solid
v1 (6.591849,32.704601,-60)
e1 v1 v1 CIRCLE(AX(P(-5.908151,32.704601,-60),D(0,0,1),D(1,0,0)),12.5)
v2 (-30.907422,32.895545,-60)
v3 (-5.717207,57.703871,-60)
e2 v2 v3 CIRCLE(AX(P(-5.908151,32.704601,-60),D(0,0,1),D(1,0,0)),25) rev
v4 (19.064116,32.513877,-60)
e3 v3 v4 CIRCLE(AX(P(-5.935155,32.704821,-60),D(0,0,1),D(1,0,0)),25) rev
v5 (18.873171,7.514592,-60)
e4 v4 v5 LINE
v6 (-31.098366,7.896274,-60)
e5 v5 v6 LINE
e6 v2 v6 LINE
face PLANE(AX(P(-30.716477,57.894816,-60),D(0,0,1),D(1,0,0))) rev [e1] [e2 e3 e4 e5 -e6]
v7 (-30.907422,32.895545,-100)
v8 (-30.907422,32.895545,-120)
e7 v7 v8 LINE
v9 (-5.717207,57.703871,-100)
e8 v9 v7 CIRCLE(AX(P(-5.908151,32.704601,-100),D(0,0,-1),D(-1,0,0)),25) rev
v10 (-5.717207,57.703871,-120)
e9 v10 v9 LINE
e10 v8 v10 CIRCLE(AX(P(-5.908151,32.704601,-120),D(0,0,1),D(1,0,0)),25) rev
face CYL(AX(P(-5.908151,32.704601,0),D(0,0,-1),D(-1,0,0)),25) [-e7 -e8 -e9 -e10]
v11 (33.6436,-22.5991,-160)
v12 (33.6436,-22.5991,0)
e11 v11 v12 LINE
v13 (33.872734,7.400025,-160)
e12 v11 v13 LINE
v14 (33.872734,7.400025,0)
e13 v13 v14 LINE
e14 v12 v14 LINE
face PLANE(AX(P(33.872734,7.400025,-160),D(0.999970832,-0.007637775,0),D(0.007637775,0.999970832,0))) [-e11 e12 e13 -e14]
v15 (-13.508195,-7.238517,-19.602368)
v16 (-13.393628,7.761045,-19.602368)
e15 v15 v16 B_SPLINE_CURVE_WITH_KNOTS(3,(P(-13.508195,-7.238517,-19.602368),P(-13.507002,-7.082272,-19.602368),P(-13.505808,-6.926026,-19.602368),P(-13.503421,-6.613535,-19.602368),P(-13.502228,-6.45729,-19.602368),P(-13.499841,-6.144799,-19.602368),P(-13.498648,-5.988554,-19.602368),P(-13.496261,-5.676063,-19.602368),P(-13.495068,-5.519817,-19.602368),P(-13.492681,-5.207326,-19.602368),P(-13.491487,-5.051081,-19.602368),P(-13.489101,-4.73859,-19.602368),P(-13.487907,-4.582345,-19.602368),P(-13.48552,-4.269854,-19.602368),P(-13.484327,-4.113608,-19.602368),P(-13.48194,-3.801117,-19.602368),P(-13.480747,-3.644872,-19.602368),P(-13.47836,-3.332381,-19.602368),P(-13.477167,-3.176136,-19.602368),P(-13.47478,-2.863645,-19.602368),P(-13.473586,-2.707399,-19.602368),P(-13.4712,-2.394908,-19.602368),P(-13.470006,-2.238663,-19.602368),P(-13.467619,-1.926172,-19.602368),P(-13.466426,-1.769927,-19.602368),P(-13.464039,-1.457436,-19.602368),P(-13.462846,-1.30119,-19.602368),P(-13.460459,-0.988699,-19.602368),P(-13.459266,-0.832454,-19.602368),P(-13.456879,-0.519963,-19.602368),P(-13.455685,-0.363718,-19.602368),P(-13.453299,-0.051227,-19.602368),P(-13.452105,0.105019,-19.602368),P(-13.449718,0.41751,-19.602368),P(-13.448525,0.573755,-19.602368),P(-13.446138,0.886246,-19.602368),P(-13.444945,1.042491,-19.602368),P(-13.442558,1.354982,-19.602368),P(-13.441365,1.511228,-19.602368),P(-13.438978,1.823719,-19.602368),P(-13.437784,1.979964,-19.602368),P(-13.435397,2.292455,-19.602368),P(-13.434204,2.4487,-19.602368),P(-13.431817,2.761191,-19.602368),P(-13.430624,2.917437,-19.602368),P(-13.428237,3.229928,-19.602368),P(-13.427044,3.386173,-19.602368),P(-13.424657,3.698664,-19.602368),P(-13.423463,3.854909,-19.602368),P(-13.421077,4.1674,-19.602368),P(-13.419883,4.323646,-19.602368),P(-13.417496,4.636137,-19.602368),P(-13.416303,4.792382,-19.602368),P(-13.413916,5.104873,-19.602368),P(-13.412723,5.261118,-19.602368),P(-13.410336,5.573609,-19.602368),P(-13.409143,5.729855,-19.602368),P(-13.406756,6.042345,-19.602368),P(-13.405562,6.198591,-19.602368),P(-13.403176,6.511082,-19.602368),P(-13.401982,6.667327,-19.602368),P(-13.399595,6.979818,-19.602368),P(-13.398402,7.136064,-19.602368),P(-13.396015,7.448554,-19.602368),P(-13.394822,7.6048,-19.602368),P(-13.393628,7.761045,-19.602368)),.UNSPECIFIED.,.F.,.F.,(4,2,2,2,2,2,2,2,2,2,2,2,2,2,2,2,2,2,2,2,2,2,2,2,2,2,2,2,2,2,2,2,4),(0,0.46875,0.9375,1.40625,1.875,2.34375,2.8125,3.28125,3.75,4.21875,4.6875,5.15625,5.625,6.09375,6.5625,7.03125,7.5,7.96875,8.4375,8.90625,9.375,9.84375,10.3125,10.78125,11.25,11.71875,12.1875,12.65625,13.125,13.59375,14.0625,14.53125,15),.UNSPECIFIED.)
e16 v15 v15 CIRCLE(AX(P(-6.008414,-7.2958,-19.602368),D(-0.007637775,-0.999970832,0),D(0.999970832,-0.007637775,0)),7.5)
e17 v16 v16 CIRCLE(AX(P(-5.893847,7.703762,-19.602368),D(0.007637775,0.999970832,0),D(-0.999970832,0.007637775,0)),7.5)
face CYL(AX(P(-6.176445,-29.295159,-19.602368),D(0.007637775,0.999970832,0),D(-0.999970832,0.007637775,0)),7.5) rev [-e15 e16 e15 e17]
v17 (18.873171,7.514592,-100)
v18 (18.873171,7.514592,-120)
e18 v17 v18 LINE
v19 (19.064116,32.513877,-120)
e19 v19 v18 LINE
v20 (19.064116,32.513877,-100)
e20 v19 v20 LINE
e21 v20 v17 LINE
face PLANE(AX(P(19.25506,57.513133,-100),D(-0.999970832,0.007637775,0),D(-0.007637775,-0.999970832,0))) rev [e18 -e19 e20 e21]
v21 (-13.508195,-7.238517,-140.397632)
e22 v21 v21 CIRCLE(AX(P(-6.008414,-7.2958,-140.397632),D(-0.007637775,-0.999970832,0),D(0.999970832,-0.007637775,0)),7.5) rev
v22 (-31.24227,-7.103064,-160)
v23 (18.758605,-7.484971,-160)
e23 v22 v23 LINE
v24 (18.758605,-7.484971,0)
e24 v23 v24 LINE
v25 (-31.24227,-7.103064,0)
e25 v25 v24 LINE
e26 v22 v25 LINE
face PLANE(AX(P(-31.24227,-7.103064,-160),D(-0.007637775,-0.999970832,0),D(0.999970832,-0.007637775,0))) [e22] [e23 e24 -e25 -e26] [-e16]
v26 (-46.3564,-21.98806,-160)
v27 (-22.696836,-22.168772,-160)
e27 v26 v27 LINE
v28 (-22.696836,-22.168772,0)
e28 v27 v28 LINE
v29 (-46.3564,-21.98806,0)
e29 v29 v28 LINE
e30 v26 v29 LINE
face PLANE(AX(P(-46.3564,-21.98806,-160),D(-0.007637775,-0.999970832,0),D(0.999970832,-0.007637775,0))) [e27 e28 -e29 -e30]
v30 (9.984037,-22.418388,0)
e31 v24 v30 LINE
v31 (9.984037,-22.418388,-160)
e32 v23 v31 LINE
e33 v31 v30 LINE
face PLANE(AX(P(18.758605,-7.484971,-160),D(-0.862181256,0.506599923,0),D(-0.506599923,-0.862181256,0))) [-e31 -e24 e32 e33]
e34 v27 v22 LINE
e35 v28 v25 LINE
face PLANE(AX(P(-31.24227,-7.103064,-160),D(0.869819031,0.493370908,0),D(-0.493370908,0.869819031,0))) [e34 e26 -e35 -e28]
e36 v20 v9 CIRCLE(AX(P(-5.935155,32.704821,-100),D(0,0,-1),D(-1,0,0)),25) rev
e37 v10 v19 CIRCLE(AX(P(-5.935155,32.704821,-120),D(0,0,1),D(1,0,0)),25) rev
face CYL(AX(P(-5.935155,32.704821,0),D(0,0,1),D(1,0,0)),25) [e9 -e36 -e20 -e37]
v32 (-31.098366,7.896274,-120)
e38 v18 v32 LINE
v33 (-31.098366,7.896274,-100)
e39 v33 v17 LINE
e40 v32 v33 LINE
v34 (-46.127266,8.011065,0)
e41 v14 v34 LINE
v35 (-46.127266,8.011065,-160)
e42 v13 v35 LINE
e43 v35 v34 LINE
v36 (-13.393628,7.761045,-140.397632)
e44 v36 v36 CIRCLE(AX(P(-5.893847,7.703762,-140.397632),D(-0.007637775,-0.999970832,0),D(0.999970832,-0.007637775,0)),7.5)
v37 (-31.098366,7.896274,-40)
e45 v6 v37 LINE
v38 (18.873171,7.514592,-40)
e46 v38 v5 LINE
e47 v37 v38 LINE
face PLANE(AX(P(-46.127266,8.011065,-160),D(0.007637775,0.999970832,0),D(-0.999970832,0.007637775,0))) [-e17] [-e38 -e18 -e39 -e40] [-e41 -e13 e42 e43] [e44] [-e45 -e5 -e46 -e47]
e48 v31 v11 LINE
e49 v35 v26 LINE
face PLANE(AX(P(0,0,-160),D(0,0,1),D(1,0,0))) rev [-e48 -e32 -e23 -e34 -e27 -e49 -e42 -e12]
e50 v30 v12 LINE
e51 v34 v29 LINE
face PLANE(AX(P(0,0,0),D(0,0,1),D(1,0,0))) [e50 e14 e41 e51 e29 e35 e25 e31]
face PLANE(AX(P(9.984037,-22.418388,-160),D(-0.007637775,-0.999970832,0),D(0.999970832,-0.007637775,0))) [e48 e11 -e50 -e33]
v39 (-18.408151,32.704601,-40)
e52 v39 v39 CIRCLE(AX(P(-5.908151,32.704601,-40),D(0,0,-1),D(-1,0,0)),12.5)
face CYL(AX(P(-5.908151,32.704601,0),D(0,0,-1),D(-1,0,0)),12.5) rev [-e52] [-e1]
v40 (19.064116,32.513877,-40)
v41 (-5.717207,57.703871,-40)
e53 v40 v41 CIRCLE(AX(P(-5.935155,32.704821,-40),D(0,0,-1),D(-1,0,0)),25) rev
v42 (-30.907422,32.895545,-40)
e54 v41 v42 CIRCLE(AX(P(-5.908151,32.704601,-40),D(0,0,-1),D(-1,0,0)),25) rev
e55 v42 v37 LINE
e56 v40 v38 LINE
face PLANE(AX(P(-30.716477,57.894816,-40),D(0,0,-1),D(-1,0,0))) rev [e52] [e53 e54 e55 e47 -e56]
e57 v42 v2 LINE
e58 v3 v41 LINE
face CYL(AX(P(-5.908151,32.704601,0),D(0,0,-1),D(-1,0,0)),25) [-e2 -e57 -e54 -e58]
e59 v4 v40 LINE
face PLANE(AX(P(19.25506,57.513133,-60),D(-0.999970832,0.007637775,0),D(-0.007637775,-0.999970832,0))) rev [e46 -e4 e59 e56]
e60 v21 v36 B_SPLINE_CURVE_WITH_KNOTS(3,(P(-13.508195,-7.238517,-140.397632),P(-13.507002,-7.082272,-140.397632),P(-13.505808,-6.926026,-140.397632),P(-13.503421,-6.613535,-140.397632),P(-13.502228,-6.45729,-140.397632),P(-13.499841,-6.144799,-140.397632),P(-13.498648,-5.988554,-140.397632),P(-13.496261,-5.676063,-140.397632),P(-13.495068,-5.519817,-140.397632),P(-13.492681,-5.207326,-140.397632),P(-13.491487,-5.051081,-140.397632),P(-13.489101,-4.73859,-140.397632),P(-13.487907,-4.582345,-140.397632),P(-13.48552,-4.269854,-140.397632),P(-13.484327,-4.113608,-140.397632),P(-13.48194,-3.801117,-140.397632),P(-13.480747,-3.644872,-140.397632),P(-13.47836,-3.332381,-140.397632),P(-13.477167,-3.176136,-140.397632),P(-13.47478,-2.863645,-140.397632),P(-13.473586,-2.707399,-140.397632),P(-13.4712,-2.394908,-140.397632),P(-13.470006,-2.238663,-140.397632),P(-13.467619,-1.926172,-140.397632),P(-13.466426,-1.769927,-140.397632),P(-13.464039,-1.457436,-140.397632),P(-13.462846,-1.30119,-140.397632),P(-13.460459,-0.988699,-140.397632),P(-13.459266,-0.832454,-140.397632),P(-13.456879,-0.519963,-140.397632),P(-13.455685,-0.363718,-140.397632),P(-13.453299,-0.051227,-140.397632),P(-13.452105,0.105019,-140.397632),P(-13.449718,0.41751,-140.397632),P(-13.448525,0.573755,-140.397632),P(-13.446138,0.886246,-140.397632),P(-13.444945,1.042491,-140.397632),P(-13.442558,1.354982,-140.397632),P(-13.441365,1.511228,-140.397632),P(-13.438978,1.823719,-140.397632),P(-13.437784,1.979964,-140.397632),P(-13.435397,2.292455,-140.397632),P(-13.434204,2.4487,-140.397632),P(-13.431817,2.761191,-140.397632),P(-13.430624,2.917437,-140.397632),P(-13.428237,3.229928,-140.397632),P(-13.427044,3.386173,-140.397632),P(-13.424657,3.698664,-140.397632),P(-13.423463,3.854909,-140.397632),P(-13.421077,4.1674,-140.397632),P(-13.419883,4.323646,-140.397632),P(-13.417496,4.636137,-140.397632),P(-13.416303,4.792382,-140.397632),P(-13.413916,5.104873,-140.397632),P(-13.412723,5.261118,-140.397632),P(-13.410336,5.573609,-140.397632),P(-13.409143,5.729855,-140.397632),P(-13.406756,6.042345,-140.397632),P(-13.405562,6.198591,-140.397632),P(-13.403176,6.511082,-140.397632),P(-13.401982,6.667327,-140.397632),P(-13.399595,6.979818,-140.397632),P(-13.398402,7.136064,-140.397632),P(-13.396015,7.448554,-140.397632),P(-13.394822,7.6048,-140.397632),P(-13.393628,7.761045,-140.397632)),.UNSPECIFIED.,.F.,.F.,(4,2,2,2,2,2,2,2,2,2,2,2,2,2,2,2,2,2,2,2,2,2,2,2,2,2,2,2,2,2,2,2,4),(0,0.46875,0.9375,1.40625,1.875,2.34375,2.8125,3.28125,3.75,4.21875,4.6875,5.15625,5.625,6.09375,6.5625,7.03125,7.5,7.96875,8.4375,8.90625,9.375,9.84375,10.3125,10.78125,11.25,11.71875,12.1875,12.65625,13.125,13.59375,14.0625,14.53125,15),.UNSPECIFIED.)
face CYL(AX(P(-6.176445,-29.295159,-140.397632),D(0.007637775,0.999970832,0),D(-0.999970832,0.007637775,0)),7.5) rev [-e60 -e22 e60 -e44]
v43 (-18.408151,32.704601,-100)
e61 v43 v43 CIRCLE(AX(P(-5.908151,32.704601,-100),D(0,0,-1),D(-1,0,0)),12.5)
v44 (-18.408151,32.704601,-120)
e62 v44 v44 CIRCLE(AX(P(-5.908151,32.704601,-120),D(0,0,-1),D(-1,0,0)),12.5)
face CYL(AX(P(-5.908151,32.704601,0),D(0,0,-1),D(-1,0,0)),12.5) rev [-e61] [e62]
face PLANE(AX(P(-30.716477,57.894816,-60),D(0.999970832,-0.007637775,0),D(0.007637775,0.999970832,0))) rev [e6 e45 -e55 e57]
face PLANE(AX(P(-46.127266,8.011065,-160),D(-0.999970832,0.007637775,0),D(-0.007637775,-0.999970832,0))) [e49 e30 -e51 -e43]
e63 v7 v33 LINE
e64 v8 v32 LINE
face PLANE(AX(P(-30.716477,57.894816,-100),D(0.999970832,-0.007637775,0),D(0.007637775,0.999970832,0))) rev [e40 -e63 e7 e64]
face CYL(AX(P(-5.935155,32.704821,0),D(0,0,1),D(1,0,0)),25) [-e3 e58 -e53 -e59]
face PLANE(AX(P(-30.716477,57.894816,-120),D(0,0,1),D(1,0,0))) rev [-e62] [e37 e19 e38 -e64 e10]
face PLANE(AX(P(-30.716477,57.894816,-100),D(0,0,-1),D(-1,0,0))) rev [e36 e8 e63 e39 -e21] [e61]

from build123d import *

# Parameters (mm, degrees)
BOSS_EXTRUDE2_DEPTH = 160
SKETCH10_R          = 7.5
CUT_EXTRUDE3_DEPTH  = 37
SKETCH15_W          = 49.972994953
SKETCH15_H          = 20
BOSS_EXTRUDE3_DEPTH = 50
FILLET8_R           = 25
FILLET9_R           = 25
FILLET10_R          = 25
FILLET11_R          = 25
SKETCH20_R          = 12.5
CUT_EXTRUDE16_DEPTH = 120


with BuildPart() as part:
    # Sketch9 → Boss-Extrude2 (new body)
    with BuildSketch(Plane.XY):
        Polygon((-46.127266272, 8.011064826), (33.872733728, 7.400024977), (33.643600468, -22.599099976), (9.984036558, -22.418388271), (18.758604622, -7.484970869), (-31.242270425, -7.10306428), (-22.696835622, -22.168771831), (-46.356399532, -21.988060127), align=None)
    extrude(amount=-BOSS_EXTRUDE2_DEPTH)

    # Sketch10 → Cut-Extrude3 (cut)
    with BuildSketch(Plane(origin=(0.058494066, 7.658298076, 0), x_dir=(0.9999708317686696, -0.007637775322375965, 0), z_dir=(0.007637775322375965, 0.9999708317686696, 0))):
        with Locations(Location((-5.952514862, 19.602368066, 0), (0, 0, 180))):
            Circle(SKETCH10_R)
        with Locations(Location((-5.952514862, 140.397631934, 0), (0, 0, 180))):
            Circle(SKETCH10_R)
    extrude(amount=-CUT_EXTRUDE3_DEPTH, mode=Mode.SUBTRACT)

    # Sketch15 → Boss-Extrude3 (add)
    with BuildSketch(Plane(origin=(0.058494066, 7.658298076, 0), x_dir=(0.9999708317686696, -0.007637775322375965, 0), z_dir=(0.007637775322375965, 0.9999708317686696, 0))):
        with Locations((-6.171271485, 50)):
            Rectangle(SKETCH15_W, SKETCH15_H)
        with Locations((-6.171271485, 110)):
            Rectangle(SKETCH15_W, SKETCH15_H)
    extrude(amount=BOSS_EXTRUDE3_DEPTH)

    # Fillet8
    fillet8_edges = [part.edges().sort_by_distance(p)[0] for p in [
        (-30.716477311, 57.894815703, -50),
    ]]
    fillet(fillet8_edges, radius=FILLET8_R)

    # Fillet9
    # the kernel refuses this fillet: 25 mm, written as the material it takes off along each edge
    with BuildSketch(Plane(origin=(19.255060017, 57.513133196, -122.5), x_dir=(-0.9999708317686696, 0.007637775322376116, 0), z_dir=(0, 0, 1))) as fillet9_piece_1_section:
        with BuildLine():
            CenterArc((FILLET9_R, FILLET9_R), FILLET9_R, 180, 90)
            Line((0, FILLET9_R), (0, 0))
            Line((0, 0), (FILLET9_R, 0))
        make_face()
    fillet9_piece_1 = extrude(amount=145, mode=Mode.PRIVATE)
    fillet9_piece_1 = split(fillet9_piece_1, bisect_by=Plane(origin=(11.883432775, 50.243784792, -100), z_dir=(0, 0, 1)), keep=Keep.TOP, mode=Mode.PRIVATE)
    add(fillet9_piece_1, mode=Mode.SUBTRACT)

    # Fillet10
    fillet10_edges = [part.edges().sort_by_distance(p)[0] for p in [
        (-30.716477311, 57.894815703, -110),
    ]]
    fillet(fillet10_edges, radius=FILLET10_R)

    # Fillet11
    # the kernel refuses this fillet: 25 mm, written as the material it takes off along each edge
    with BuildSketch(Plane(origin=(19.255060017, 57.513133196, -37.5), x_dir=(-0.9999708317686696, 0.007637775322376116, 0), z_dir=(0, 0, -1))) as fillet11_piece_1:
        with BuildLine():
            CenterArc((FILLET11_R, -FILLET11_R), FILLET11_R, 90, 90)
            Line((0, -FILLET11_R), (0, 0))
            Line((0, 0), (FILLET11_R, 0))
        make_face()
    extrude(amount=145, mode=Mode.SUBTRACT)

    # Sketch20 → Cut-Extrude16 (cut)
    with BuildSketch(Plane(origin=(0, 0, -120), x_dir=(-1, 0, 0), z_dir=(0, 0, -1))):
        with Locations((5.9081509, 32.704600526)):
            Circle(SKETCH20_R)
    extrude(amount=-CUT_EXTRUDE16_DEPTH, mode=Mode.SUBTRACT)


solid = part.part
